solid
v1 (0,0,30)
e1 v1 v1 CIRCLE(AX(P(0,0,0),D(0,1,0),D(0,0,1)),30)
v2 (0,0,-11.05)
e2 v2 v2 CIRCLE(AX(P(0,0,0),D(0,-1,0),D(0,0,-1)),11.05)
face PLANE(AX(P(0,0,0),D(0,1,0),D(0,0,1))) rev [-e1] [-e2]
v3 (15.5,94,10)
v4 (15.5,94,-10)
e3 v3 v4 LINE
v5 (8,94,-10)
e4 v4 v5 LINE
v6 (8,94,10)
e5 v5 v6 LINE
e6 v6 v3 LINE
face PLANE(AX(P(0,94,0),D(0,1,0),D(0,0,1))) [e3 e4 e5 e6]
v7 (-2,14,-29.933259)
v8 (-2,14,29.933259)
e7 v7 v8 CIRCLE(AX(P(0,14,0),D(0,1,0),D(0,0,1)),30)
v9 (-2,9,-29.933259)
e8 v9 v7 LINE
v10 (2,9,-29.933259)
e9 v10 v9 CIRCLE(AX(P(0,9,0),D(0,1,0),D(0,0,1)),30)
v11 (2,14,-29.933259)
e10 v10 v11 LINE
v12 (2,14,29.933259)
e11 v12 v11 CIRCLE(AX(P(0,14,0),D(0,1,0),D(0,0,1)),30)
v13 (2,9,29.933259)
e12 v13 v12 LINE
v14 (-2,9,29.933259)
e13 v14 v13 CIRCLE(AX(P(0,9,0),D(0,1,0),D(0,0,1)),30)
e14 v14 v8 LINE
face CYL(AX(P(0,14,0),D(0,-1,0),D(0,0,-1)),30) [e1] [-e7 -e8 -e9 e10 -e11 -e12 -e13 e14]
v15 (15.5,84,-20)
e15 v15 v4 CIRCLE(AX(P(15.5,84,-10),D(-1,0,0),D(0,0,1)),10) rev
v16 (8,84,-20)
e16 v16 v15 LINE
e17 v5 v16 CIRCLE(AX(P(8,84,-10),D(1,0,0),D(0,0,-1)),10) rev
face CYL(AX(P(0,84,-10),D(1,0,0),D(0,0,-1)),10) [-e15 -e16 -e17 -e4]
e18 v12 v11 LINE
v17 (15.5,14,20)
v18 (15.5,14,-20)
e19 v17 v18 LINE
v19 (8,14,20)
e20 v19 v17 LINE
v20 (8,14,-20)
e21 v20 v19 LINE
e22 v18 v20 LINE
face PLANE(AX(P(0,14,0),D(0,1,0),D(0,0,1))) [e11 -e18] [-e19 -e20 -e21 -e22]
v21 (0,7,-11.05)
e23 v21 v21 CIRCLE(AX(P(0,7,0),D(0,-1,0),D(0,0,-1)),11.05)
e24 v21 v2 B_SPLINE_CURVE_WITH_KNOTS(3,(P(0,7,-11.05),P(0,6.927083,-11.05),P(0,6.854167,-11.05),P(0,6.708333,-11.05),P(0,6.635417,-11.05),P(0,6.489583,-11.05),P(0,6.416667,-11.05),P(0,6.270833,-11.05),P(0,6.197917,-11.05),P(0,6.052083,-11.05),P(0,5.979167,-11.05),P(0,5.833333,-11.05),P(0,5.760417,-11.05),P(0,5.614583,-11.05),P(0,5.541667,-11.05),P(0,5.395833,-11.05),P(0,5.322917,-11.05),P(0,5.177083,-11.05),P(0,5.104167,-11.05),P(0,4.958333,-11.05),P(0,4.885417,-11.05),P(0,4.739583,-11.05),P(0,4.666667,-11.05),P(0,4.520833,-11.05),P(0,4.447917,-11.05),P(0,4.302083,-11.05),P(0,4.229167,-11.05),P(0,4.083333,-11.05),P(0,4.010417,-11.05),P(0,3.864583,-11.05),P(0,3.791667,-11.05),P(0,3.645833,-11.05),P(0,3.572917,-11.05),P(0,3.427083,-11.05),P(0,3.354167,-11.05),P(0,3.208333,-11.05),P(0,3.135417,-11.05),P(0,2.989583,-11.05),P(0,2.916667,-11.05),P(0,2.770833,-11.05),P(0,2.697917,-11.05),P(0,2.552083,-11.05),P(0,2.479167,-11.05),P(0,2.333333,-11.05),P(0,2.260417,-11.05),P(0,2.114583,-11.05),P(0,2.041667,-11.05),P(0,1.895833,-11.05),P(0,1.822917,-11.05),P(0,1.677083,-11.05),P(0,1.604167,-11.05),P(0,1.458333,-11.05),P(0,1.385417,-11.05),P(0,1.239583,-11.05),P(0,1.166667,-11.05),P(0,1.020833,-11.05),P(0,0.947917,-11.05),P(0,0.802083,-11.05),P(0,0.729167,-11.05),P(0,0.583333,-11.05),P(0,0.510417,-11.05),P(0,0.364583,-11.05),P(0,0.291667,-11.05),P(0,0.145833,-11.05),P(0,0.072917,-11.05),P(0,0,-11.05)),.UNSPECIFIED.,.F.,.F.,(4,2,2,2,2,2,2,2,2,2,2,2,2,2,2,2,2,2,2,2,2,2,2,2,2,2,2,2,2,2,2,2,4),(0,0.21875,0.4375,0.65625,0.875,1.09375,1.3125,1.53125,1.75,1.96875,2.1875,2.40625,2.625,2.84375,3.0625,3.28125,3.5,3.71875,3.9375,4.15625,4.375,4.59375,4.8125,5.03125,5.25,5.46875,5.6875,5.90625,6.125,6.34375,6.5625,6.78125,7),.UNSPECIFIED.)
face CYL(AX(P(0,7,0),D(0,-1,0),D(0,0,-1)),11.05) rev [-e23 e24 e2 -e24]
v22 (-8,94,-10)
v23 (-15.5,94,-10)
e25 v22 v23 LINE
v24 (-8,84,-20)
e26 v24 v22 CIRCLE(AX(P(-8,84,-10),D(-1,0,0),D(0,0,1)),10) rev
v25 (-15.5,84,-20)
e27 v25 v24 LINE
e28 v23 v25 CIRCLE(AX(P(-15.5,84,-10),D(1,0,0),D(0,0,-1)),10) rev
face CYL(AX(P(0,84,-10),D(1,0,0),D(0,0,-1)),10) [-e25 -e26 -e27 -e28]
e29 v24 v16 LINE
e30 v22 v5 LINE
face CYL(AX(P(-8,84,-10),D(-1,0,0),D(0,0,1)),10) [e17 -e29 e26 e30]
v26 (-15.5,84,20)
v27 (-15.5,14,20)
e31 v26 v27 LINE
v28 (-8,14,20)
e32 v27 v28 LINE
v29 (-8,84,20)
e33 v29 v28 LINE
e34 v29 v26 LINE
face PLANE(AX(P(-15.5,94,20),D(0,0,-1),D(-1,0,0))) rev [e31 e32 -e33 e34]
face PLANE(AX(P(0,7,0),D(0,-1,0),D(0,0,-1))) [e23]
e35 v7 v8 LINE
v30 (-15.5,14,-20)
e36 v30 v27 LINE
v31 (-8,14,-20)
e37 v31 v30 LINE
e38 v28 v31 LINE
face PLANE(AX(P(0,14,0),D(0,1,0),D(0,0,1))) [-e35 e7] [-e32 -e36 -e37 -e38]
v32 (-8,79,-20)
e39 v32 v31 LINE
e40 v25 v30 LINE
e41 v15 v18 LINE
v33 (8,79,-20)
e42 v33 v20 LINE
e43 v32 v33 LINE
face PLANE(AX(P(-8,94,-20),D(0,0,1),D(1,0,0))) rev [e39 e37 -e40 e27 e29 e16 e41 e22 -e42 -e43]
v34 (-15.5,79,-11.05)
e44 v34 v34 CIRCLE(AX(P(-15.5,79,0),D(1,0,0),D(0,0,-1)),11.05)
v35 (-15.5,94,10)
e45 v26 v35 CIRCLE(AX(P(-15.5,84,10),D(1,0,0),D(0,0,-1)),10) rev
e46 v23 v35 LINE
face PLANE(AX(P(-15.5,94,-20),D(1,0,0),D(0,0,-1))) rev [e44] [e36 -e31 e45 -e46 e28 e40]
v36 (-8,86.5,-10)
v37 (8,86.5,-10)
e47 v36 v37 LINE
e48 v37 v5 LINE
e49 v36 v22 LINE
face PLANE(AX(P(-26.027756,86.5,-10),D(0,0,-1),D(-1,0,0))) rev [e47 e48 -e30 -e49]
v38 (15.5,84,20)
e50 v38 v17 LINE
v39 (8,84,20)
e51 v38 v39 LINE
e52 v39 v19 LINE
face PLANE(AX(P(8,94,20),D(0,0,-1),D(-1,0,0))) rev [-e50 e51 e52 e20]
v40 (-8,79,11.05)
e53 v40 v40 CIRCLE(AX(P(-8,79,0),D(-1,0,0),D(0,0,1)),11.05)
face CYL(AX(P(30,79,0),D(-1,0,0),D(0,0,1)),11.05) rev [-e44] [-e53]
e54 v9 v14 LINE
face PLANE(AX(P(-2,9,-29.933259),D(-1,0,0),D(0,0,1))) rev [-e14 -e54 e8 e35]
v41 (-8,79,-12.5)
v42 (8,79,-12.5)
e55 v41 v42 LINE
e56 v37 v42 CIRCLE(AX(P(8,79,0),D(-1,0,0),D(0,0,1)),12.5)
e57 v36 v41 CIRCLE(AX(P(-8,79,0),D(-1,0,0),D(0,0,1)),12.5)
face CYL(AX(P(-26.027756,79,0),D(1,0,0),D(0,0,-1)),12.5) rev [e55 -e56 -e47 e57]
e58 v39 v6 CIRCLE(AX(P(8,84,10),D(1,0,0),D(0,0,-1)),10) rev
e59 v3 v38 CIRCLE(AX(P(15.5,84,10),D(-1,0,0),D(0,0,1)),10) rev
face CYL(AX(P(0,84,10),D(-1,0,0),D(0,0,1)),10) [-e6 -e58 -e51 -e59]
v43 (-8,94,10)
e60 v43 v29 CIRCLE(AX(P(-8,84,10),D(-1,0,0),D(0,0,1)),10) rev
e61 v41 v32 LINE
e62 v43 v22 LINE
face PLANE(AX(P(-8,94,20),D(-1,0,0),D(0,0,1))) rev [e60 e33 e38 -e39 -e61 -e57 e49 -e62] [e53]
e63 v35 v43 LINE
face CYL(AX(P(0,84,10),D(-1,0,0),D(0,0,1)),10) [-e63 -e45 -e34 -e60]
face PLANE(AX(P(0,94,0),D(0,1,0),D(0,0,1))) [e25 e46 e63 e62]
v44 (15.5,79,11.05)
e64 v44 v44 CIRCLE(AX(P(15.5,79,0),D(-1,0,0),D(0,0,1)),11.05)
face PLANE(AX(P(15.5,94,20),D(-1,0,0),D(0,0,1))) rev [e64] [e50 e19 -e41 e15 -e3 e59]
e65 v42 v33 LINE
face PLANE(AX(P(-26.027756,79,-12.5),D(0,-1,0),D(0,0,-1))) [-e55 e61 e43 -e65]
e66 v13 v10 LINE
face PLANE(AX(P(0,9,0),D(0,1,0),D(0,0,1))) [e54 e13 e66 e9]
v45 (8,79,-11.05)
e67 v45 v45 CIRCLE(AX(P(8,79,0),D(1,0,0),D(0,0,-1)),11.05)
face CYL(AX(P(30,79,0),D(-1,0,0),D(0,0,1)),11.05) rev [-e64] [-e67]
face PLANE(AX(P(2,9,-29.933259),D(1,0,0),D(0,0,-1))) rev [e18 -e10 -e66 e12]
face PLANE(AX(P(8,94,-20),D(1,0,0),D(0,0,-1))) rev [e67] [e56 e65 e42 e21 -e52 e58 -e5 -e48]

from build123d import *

# Parameters (mm, degrees)
SKETCH1_R               = 30
BOSS_EXTRUDE1_DEPTH     = 14
SKETCH2_R               = 11.05
CUT_EXTRUDE1_DEPTH      = 7
SKETCH5_W               = 7.5
SKETCH5_H               = 40
BOSS_EXTRUDE2_DEPTH     = 80
FILLET1_R               = 10
CUT_EXTRUDE3_DEPTH      = 109.656569061
CUT_EXTRUDE3_DEPTH_BACK = 109.656569061
SKETCH7_R               = 11.05
CUT_EXTRUDE4_START      = -5
CUT_EXTRUDE4_DEPTH      = 5
BOSS_EXTRUDE4_DEPTH     = 16
FILLET2_R               = 10


with BuildPart() as part:
    # Sketch1 → Boss-Extrude1 (new body)
    with BuildSketch(Plane(origin=(0, 0, 0), x_dir=(1, 0, 0), z_dir=(0, 1, 0))):
        with Locations(Location((0, 0, 0), (0, 0, 90))):
            Circle(SKETCH1_R)
    extrude(amount=BOSS_EXTRUDE1_DEPTH)

    # Sketch2 → Cut-Extrude1 (cut)
    with BuildSketch(Plane.XZ):
        with Locations(Location((0, 0, 0), (0, 0, 270))):
            Circle(SKETCH2_R)
    extrude(amount=-CUT_EXTRUDE1_DEPTH, mode=Mode.SUBTRACT)

    # Sketch5 → Boss-Extrude2 (add)
    with BuildSketch(Plane(origin=(0, 14, 0), x_dir=(1, 0, 0), z_dir=(0, 1, 0))):
        with Locations((-11.75, 0)):
            Rectangle(SKETCH5_W, SKETCH5_H)
        with Locations((11.75, 0)):
            Rectangle(SKETCH5_W, SKETCH5_H)
    extrude(amount=BOSS_EXTRUDE2_DEPTH)

    # Fillet1
    fillet1_edges = [part.edges().sort_by_distance(p)[0] for p in [
        (-11.75, 94, 20),
        (-11.75, 94, -20),
        (11.75, 94, 20),
        (11.75, 94, -20),
    ]]
    fillet(fillet1_edges, radius=FILLET1_R)

    # Sketch7 → Cut-Extrude3 (cut, two sides: drawn at the far end of the back side and taken through both)
    with BuildSketch(Plane.ZY.offset(15.5).offset(-CUT_EXTRUDE3_DEPTH_BACK)):
        with Locations((0, 79)):
            Circle(SKETCH7_R)
    extrude(amount=CUT_EXTRUDE3_DEPTH + CUT_EXTRUDE3_DEPTH_BACK, mode=Mode.SUBTRACT)

    # Sketch8 → Cut-Extrude4 (cut)
    with BuildSketch(Plane(origin=(0, 14, 0), x_dir=(1, 0, 0), z_dir=(0, 1, 0)).offset(CUT_EXTRUDE4_START)):
        with BuildLine():
            Line((2, 29.933259094), (2, -29.933259094))
            ThreePointArc((2, -29.933259094), (0, -30), (-2, -29.933259094))
            Line((-2, -29.933259094), (-2, 29.933259094))
            ThreePointArc((-2, 29.933259094), (0, 30), (2, 29.933259094))
        make_face()
    extrude(amount=CUT_EXTRUDE4_DEPTH, mode=Mode.SUBTRACT)

    # Sketch9 → Boss-Extrude4 (add)
    with BuildSketch(Plane.ZY.offset(-8)):
        with BuildLine():
            Line((-10, 86.5), (-10, 94))
            Line((-10, 94), (-20, 94))
            Line((-20, 94), (-20, 79))
            Line((-20, 79), (-12.5, 79))
            ThreePointArc((-12.5, 79), (-11.858541226, 82.952847075), (-10, 86.5))
        make_face()
    extrude(amount=BOSS_EXTRUDE4_DEPTH)

    # Fillet2
    fillet2_edges = [part.edges().sort_by_distance(p)[0] for p in [
        (0, 94, -20),
    ]]
    fillet(fillet2_edges, radius=FILLET2_R - 0.0001)  # a hair under: the kernel refuses the full size


solid = part.part
